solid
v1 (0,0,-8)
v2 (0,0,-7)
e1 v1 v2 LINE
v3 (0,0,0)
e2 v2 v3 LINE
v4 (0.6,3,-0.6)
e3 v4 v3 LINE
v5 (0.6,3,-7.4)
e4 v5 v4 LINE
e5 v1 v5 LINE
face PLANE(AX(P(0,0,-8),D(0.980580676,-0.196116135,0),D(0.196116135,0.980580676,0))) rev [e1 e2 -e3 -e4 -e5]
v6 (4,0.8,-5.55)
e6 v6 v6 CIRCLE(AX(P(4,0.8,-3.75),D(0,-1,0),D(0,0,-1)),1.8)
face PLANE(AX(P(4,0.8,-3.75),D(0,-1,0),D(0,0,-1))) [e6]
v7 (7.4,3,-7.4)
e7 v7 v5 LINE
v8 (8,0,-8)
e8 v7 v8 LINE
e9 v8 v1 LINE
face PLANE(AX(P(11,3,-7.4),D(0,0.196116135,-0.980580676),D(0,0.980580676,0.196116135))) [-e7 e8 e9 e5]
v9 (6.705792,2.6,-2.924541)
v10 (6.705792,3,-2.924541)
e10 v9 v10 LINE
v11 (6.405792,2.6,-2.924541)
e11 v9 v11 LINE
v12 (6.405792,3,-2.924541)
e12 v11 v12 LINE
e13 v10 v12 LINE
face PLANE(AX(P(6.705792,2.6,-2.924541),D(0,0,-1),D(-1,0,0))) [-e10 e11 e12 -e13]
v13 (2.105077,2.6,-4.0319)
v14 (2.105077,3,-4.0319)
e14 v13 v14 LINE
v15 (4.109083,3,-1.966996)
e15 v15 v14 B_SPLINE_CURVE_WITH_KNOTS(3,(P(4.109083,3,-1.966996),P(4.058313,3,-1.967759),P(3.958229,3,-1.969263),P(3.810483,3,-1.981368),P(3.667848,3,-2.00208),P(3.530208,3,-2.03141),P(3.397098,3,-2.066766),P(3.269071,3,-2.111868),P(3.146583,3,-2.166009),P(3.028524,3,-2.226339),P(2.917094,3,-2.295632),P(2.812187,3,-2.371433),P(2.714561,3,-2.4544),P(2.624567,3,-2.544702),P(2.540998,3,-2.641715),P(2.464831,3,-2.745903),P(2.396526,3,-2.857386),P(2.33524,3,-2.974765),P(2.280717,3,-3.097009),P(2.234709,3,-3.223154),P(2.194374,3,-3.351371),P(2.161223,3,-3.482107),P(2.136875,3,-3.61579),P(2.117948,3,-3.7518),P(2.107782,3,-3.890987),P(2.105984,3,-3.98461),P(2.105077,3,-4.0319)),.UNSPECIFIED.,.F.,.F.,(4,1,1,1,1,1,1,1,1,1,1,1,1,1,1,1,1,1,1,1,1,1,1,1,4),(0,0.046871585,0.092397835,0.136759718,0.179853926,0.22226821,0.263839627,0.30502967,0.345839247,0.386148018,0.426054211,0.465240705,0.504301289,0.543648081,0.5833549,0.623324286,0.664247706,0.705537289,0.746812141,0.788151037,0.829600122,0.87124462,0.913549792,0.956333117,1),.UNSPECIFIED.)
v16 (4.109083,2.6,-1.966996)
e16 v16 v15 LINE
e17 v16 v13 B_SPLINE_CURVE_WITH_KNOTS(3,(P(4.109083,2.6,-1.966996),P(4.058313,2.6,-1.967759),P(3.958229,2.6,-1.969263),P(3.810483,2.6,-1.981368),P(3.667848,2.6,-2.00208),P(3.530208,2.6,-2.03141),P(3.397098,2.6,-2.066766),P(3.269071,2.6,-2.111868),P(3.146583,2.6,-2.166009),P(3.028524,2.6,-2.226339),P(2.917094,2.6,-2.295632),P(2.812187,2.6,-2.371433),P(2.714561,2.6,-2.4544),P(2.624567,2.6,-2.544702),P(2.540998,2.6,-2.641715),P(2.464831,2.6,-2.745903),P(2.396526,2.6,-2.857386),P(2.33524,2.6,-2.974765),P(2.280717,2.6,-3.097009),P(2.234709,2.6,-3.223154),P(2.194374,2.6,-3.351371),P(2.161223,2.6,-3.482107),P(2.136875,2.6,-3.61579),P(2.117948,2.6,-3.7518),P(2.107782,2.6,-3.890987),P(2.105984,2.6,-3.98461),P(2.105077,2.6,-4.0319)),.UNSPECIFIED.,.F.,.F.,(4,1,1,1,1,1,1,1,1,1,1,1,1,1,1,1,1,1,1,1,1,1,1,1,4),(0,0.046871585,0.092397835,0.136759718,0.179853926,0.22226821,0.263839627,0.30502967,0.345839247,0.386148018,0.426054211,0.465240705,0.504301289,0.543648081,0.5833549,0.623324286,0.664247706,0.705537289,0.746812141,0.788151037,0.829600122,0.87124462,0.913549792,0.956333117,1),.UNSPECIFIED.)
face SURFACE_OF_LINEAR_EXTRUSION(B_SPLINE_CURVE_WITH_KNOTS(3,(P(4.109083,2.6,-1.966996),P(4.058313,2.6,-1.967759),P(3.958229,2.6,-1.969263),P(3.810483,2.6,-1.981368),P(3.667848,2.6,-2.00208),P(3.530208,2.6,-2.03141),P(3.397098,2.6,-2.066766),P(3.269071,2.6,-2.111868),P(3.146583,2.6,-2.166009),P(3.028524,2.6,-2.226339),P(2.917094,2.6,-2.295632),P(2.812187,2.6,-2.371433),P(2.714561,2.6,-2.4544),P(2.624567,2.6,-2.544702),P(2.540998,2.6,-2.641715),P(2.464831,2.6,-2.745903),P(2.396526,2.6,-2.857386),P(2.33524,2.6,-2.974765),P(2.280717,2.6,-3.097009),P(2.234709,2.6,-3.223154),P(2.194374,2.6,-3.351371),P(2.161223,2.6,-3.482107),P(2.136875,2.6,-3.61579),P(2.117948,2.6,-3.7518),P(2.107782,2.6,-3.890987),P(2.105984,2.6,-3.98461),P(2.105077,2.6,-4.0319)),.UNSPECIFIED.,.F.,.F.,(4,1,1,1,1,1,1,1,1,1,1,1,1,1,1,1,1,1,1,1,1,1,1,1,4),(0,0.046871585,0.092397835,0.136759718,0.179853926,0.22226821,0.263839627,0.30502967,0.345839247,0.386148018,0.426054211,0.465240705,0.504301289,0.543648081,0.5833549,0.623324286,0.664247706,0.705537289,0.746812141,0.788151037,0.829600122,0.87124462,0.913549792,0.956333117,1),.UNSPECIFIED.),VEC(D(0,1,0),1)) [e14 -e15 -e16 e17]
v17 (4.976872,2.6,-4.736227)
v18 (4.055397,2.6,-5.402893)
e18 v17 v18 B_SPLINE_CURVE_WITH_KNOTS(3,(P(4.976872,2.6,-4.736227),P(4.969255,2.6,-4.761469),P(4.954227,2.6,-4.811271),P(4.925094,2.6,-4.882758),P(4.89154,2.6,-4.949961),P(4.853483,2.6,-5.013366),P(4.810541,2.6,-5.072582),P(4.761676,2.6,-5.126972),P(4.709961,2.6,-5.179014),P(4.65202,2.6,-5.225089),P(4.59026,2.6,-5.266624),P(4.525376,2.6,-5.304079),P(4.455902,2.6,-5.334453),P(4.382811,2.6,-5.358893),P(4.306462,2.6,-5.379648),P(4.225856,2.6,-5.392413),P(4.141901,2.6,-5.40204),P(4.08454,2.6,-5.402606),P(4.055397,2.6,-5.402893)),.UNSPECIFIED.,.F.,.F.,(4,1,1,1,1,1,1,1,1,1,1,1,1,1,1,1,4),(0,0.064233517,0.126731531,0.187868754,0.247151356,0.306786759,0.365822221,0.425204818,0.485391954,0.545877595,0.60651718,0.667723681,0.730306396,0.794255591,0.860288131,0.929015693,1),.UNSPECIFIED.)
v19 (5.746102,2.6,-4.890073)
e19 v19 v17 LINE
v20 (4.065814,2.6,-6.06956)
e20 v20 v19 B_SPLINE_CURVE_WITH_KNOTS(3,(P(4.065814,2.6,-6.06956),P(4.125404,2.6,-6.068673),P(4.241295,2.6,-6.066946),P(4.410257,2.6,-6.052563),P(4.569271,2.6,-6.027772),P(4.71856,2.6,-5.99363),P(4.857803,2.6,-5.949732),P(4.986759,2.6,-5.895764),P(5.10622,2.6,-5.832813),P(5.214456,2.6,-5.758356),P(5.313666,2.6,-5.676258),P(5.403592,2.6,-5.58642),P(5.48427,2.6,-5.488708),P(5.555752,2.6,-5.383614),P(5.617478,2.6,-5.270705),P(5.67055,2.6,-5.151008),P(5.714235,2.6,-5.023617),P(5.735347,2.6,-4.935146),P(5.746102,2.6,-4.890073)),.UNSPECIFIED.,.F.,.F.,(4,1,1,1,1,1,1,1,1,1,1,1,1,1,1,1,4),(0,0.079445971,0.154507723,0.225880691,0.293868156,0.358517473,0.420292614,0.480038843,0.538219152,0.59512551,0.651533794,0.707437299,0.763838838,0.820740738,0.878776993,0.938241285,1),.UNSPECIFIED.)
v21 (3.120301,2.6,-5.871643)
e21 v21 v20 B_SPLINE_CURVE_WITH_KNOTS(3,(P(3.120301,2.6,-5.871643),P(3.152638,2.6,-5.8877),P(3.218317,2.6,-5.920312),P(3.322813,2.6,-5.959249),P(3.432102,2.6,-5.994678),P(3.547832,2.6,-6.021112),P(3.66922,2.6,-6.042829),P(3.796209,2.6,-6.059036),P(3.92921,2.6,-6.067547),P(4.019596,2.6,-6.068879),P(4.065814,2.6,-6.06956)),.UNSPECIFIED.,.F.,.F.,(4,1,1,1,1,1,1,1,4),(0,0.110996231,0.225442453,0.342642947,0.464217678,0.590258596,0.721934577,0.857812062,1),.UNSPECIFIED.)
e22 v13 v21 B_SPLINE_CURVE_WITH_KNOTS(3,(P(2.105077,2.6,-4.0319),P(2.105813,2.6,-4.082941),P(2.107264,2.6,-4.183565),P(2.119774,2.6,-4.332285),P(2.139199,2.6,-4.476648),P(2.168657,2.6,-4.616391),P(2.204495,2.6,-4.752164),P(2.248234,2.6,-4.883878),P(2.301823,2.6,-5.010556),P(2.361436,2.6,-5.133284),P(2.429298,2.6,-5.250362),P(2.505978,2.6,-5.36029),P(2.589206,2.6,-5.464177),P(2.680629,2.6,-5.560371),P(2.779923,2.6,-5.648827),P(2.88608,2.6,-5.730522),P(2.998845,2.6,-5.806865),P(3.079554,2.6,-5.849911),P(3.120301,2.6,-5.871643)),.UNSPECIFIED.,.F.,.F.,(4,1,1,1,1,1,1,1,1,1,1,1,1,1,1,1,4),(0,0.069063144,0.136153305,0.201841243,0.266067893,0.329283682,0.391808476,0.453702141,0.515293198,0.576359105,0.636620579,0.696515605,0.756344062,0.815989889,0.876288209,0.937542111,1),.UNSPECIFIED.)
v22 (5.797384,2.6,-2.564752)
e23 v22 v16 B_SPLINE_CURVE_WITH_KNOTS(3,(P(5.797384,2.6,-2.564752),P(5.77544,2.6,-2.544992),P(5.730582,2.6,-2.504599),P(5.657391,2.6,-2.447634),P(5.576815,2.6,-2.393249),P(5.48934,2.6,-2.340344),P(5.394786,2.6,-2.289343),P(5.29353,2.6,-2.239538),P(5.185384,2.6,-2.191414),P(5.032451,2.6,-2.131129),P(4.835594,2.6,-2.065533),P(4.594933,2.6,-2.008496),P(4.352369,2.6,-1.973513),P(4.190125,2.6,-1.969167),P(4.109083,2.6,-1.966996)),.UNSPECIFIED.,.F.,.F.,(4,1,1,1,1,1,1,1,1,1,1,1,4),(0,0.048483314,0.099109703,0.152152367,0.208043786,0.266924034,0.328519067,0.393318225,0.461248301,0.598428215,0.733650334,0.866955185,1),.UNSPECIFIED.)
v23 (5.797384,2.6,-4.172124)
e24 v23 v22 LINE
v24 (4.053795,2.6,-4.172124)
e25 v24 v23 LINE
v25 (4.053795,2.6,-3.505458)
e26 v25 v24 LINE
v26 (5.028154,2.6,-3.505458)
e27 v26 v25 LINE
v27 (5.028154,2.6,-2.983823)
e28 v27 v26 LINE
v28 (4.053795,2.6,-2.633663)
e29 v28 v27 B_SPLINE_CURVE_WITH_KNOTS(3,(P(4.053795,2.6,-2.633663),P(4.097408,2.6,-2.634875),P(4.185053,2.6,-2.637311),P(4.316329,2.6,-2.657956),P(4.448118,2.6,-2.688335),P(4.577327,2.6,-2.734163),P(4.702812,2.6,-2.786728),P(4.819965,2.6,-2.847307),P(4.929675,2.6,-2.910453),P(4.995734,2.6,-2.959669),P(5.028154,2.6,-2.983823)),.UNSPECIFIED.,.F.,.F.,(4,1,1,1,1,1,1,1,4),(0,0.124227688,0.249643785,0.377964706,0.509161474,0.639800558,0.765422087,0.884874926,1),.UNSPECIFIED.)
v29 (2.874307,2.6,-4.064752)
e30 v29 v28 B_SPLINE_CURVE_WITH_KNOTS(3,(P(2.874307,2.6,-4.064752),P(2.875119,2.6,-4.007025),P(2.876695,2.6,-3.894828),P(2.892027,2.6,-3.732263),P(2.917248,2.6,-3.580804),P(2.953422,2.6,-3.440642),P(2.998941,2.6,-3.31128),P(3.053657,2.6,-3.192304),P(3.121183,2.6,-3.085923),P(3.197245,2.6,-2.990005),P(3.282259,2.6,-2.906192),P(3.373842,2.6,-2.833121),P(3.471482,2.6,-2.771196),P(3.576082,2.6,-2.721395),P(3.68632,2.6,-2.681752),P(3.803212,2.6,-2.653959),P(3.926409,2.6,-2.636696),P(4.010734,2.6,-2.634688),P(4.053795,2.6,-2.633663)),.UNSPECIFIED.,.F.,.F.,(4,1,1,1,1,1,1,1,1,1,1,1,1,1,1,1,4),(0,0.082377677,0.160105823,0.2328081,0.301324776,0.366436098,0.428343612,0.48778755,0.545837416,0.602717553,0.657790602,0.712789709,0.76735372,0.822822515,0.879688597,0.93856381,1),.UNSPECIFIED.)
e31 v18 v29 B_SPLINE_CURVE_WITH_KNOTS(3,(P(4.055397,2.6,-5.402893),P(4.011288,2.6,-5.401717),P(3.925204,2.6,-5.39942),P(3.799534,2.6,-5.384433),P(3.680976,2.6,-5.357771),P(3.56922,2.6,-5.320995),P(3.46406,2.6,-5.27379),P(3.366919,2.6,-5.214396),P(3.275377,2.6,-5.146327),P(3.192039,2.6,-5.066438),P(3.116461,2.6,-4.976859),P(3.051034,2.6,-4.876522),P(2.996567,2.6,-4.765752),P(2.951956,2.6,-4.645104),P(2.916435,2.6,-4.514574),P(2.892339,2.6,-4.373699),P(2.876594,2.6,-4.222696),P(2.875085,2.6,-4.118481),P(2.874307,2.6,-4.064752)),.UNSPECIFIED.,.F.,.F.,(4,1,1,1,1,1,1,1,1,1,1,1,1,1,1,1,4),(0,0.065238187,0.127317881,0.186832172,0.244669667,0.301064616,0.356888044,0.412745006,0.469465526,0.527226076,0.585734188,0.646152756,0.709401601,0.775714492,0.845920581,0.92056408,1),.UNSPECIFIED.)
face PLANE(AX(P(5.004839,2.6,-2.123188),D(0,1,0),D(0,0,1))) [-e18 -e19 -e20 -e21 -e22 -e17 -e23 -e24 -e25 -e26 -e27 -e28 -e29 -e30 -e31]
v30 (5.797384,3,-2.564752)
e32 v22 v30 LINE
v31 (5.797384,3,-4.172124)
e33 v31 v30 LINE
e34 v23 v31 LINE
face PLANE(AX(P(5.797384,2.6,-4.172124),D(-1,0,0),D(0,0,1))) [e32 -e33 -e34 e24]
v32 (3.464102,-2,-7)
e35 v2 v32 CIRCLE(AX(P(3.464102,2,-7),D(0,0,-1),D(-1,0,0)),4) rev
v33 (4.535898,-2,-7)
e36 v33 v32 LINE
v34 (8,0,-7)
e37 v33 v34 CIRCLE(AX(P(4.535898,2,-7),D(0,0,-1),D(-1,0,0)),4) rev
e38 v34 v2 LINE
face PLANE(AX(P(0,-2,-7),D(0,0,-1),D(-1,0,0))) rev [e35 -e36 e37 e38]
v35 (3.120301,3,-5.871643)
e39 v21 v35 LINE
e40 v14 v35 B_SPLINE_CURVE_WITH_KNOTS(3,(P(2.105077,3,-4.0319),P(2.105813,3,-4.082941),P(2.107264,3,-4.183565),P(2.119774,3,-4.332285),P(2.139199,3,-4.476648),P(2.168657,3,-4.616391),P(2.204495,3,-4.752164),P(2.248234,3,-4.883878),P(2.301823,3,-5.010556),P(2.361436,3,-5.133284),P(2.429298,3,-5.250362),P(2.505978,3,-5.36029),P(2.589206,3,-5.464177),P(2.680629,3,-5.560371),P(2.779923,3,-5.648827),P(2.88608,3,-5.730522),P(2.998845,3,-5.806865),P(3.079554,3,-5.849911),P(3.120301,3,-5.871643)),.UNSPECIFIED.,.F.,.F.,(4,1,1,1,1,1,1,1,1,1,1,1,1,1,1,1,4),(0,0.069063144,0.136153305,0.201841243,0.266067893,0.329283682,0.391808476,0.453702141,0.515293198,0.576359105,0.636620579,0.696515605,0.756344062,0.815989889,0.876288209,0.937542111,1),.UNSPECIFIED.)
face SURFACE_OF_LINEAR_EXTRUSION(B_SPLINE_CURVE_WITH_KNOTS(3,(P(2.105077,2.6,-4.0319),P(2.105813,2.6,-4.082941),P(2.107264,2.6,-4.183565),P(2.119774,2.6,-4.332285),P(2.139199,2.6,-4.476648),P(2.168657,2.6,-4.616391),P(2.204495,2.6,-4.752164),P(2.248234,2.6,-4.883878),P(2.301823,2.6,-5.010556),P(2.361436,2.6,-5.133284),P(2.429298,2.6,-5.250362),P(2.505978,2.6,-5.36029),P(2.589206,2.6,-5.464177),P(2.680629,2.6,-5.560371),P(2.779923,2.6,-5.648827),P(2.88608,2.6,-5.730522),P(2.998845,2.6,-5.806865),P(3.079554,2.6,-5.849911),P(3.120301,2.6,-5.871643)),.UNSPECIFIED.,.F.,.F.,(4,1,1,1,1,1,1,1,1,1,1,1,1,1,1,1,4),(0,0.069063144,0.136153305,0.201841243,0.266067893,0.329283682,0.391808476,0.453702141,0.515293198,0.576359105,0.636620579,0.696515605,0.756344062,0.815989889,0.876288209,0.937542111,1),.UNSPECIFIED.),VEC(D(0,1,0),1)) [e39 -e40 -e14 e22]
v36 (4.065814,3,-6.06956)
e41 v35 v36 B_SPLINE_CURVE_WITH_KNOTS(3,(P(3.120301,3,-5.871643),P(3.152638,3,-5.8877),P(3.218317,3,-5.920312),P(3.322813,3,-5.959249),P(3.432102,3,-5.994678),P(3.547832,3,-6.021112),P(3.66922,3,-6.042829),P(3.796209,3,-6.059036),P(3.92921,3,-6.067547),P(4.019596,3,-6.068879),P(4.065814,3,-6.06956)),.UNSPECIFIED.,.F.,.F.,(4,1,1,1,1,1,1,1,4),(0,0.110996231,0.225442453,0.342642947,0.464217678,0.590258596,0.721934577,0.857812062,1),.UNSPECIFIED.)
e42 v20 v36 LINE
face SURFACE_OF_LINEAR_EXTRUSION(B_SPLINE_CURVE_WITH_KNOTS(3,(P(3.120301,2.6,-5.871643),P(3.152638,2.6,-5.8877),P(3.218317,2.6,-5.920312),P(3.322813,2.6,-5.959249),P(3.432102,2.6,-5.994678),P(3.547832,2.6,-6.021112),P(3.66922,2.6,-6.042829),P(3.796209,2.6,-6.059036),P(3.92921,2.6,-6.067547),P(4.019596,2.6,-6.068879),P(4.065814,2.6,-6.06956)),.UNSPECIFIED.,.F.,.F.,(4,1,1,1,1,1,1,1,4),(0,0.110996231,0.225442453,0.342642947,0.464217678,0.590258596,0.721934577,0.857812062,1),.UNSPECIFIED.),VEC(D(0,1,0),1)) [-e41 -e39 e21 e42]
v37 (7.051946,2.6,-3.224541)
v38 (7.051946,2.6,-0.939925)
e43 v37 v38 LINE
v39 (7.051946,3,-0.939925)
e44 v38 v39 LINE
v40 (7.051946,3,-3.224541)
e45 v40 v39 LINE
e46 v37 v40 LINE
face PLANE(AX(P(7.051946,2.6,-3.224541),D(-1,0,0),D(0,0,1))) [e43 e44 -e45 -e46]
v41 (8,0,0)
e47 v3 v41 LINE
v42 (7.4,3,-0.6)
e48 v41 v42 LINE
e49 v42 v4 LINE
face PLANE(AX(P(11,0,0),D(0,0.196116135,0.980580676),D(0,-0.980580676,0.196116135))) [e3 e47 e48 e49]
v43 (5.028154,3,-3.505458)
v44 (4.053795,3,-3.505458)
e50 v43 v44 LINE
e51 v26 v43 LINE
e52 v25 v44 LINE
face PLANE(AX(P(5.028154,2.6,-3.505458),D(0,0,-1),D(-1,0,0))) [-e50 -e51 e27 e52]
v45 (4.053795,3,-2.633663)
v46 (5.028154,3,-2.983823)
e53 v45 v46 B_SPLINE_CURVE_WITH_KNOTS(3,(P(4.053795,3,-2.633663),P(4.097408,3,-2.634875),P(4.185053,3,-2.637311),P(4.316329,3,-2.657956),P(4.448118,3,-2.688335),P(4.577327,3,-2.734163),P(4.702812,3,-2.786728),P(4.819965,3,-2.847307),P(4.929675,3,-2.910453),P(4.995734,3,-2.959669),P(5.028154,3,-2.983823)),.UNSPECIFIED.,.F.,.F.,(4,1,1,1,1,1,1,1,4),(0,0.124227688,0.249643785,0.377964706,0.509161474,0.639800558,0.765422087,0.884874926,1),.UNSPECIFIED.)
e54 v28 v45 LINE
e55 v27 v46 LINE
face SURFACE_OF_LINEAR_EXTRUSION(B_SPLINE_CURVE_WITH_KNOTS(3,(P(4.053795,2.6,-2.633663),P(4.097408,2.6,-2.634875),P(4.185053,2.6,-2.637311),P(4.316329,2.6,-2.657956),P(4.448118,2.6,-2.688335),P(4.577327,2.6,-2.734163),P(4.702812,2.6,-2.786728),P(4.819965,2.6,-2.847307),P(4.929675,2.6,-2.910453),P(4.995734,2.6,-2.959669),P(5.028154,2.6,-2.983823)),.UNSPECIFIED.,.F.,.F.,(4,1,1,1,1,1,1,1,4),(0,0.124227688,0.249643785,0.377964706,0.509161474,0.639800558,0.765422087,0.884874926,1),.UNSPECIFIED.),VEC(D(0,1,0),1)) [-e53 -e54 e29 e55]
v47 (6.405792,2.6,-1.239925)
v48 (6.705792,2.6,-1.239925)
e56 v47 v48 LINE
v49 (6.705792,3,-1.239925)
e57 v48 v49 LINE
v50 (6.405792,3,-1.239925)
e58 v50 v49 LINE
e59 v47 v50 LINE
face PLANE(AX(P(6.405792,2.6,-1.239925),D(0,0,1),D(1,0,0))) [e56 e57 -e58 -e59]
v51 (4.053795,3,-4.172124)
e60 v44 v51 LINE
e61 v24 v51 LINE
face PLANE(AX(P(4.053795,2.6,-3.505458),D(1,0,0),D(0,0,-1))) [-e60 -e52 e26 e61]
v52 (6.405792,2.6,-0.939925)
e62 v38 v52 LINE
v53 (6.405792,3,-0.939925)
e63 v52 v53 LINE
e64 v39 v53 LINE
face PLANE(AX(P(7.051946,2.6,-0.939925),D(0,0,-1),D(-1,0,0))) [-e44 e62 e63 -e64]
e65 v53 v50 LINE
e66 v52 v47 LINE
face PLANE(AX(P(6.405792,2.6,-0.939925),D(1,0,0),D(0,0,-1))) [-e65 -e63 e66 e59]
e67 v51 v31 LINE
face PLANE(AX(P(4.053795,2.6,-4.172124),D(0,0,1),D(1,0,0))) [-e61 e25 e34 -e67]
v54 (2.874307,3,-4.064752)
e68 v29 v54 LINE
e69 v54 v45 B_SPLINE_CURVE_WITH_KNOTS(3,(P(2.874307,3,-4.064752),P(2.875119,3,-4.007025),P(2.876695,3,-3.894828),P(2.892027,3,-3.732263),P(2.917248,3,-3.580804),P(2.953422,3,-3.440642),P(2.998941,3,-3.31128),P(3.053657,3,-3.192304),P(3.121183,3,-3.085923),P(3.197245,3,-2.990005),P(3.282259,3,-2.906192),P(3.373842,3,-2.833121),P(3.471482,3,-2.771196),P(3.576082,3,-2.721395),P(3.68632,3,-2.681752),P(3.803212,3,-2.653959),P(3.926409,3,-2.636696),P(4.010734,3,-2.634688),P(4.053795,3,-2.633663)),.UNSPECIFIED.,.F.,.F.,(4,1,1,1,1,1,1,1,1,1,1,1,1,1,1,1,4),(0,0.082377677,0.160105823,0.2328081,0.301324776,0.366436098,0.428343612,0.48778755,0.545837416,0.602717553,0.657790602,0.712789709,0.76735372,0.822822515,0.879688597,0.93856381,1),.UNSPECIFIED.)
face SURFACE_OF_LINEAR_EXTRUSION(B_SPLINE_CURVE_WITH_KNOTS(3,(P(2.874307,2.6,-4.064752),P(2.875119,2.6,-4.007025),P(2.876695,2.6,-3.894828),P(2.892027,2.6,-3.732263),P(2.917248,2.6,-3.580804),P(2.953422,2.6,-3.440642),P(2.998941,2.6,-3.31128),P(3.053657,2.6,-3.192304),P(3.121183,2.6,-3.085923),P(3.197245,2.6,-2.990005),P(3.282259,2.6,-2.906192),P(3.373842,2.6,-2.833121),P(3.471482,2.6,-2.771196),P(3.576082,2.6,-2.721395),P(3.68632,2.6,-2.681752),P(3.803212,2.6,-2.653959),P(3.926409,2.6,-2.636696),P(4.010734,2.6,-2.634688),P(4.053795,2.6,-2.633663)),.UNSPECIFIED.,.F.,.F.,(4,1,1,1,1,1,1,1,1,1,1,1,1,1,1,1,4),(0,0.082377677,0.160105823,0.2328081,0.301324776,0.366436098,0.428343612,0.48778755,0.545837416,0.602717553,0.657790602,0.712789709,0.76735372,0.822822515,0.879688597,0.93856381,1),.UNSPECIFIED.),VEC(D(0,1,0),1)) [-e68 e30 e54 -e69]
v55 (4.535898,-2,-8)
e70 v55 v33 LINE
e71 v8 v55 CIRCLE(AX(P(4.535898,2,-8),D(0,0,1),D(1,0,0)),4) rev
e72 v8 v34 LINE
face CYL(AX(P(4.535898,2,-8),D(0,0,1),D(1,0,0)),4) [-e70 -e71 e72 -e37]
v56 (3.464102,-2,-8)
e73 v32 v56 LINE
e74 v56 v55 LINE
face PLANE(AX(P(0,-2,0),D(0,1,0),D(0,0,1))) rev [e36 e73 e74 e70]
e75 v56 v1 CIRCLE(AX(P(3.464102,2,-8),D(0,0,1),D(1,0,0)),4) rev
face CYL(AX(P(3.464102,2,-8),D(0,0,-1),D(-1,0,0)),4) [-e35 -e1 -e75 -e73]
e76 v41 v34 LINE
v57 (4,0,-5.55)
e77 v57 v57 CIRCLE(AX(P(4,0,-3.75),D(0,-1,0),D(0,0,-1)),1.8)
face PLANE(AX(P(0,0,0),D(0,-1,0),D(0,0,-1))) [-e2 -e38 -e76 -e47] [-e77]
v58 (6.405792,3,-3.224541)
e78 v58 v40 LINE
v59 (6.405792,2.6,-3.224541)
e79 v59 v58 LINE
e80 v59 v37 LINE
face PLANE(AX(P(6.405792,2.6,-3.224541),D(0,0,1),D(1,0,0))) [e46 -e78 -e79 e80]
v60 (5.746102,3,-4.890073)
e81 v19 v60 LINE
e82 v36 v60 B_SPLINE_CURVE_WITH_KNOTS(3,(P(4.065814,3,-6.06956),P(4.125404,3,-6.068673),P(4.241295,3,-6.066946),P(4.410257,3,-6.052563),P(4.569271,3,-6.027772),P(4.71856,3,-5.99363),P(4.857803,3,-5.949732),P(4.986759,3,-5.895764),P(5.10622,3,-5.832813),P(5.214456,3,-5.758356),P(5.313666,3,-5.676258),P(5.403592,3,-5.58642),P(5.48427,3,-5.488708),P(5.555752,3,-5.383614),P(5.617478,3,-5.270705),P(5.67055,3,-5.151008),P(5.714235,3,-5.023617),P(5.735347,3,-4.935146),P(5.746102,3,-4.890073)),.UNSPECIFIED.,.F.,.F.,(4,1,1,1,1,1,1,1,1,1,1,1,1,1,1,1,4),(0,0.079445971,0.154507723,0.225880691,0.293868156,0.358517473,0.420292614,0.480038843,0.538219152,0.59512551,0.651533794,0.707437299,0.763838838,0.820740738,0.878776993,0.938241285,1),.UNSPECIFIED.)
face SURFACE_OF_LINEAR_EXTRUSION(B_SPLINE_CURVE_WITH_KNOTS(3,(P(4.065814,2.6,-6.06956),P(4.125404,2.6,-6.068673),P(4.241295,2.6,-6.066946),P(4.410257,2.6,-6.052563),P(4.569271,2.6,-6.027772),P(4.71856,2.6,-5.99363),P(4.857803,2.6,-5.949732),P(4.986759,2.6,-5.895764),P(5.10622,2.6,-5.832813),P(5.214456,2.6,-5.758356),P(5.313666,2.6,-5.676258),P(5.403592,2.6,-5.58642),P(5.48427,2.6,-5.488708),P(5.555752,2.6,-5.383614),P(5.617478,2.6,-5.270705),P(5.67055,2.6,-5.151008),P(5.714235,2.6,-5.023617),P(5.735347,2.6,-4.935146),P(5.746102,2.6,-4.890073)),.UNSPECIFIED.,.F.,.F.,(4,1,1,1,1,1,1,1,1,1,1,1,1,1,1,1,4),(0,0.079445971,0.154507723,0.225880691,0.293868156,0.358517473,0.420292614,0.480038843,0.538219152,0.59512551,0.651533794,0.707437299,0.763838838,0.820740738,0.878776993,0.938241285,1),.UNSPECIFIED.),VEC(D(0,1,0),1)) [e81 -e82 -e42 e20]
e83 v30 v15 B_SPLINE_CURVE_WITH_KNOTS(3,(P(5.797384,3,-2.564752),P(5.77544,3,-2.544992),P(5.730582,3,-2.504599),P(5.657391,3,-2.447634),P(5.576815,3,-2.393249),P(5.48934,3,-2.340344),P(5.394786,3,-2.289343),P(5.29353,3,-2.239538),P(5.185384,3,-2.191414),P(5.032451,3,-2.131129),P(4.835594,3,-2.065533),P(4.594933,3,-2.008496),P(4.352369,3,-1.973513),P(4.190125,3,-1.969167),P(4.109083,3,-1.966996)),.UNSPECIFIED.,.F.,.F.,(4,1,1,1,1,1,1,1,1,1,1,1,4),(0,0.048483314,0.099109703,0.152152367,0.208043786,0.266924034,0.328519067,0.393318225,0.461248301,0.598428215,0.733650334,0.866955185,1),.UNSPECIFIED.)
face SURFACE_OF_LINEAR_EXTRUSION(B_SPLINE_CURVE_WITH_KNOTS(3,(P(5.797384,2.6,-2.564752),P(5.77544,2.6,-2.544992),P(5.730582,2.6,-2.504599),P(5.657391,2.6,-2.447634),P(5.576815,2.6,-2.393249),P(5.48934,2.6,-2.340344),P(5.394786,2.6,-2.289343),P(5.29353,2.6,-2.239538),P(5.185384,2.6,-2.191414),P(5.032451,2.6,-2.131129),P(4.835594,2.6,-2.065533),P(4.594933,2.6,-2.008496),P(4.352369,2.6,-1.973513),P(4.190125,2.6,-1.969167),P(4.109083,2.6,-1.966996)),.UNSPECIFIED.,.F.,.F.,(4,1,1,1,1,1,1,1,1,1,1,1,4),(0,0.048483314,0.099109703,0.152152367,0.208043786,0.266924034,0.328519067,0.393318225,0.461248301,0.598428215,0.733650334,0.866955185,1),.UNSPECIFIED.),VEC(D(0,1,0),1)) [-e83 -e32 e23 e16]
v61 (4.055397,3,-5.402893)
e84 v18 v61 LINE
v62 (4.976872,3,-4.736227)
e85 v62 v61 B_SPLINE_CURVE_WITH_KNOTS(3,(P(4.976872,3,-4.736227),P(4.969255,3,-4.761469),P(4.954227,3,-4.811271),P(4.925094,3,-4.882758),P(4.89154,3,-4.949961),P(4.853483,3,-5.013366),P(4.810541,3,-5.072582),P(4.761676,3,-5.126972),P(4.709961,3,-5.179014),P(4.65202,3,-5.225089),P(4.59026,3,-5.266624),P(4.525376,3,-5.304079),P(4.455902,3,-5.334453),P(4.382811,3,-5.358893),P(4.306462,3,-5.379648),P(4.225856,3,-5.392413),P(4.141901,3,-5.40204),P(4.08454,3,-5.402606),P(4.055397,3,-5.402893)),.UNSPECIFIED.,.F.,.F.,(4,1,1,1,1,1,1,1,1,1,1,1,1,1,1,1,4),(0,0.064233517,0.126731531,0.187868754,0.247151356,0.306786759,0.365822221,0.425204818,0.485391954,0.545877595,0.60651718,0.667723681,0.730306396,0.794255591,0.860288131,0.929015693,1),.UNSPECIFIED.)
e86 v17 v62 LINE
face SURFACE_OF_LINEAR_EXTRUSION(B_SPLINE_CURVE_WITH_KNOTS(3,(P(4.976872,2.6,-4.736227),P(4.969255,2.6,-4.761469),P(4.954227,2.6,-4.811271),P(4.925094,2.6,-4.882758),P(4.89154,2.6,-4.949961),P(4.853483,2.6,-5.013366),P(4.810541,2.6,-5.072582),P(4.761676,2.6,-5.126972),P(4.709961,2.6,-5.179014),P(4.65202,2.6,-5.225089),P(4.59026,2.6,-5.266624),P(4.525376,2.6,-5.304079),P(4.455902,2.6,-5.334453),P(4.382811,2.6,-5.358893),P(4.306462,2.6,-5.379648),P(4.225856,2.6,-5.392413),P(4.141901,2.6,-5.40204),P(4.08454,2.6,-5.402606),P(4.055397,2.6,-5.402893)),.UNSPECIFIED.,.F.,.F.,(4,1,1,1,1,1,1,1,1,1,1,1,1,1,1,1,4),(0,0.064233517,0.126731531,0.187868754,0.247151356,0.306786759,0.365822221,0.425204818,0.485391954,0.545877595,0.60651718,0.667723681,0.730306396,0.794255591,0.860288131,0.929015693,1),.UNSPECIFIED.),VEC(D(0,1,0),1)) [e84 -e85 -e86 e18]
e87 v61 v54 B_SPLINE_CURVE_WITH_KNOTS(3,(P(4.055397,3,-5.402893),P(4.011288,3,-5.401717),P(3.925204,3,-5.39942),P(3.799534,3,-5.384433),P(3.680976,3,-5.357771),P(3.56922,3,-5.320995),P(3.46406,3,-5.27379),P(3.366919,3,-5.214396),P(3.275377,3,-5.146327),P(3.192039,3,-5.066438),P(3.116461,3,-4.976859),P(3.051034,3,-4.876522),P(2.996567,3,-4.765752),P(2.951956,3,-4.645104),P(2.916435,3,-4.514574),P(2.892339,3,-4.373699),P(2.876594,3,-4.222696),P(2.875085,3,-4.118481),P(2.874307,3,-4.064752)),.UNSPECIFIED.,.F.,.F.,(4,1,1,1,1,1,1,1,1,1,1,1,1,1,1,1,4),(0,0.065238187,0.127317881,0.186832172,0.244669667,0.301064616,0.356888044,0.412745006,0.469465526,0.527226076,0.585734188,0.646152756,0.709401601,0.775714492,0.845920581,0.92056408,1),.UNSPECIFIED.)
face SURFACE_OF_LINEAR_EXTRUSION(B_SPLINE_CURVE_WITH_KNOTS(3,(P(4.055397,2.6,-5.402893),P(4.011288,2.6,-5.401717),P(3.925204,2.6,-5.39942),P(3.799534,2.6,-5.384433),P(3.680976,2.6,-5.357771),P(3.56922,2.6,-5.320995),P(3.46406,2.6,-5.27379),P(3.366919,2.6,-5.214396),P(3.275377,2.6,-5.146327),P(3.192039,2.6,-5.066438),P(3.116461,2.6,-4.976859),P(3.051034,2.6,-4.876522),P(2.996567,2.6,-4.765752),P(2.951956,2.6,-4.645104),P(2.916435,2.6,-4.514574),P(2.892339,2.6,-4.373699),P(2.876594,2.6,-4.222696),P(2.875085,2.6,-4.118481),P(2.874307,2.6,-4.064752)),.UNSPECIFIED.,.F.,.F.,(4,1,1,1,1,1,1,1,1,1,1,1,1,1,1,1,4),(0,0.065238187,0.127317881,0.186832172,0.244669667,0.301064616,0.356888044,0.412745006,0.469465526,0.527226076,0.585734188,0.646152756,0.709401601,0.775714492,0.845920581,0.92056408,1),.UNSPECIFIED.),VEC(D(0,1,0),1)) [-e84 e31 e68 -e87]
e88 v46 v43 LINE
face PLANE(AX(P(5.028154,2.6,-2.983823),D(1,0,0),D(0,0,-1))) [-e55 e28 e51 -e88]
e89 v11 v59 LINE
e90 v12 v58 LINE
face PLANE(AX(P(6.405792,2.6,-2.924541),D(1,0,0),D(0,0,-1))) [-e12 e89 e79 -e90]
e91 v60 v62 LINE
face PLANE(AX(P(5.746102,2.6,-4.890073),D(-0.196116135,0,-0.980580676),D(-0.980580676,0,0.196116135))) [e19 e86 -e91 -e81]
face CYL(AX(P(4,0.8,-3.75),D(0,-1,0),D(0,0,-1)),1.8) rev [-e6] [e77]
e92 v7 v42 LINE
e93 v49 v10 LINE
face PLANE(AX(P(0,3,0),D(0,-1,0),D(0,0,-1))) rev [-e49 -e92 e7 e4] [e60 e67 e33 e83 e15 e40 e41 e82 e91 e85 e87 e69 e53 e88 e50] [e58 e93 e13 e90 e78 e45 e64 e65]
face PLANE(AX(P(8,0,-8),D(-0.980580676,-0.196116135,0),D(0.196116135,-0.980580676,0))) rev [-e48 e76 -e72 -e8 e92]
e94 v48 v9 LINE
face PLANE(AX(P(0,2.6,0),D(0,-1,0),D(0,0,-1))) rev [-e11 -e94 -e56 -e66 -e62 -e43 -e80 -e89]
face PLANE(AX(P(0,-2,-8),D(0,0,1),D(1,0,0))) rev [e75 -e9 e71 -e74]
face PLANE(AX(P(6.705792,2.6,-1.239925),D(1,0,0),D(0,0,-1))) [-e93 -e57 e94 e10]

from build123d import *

# Parameters (mm, degrees)
SKETCH1_W               = 8
SKETCH1_H               = 8
BOSS_EXTRUDE1_DEPTH     = 3
CUT_EXTRUDE1_DEPTH      = 12.704699911
CUT_EXTRUDE1_DEPTH_BACK = 12.704699911
CUT_EXTRUDE2_DEPTH      = 11
SKETCH4_R               = 1.8
CUT_EXTRUDE3_DEPTH      = 0.8
SKETCH5_W               = 8
SKETCH5_H               = 1
BOSS_EXTRUDE2_DEPTH     = 2
FILLET1_R               = 4
CUT_EXTRUDE4_DEPTH      = 0.4
CUT_EXTRUDE5_DEPTH      = 0.4


with BuildPart() as part:
    # Sketch1 → Boss-Extrude1 (new body)
    with BuildSketch(Plane(origin=(0, 0, 0), x_dir=(1, 0, 0), z_dir=(0, 1, 0))):
        with Locations((4, 4)):
            Rectangle(SKETCH1_W, SKETCH1_H)
    extrude(amount=BOSS_EXTRUDE1_DEPTH)

    # Sketch2 → Cut-Extrude1 (cut, two sides: drawn at the far end of the back side and taken through both)
    with BuildSketch(Plane.XY.offset(-CUT_EXTRUDE1_DEPTH_BACK)):
        Polygon((0, 0), (0.6, 3), (0, 3), align=None)
        Polygon((8, 0), (7.4, 3), (8, 3), align=None)
    extrude(amount=CUT_EXTRUDE1_DEPTH + CUT_EXTRUDE1_DEPTH_BACK, mode=Mode.SUBTRACT)

    # Sketch3 → Cut-Extrude2 (cut)
    with BuildSketch(Plane(origin=(0, 0, 0), x_dir=(0, 0, -1), z_dir=(1, 0, 0))):
        Polygon((0, 0), (0.6, 3), (0, 3), align=None)
        Polygon((8, 3), (7.4, 3), (8, 0), align=None)
    extrude(amount=CUT_EXTRUDE2_DEPTH, mode=Mode.SUBTRACT)

    # Sketch4 → Cut-Extrude3 (cut)
    with BuildSketch(Plane.XZ):
        with Locations(Location((4, -3.75, 0), (0, 0, 270))):
            Circle(SKETCH4_R)
    extrude(amount=-CUT_EXTRUDE3_DEPTH, mode=Mode.SUBTRACT)

    # Sketch5 → Boss-Extrude2 (add)
    with BuildSketch(Plane.XZ):
        with Locations((4, -7.5)):
            Rectangle(SKETCH5_W, SKETCH5_H)
    extrude(amount=BOSS_EXTRUDE2_DEPTH)

    # Fillet1
    # the kernel refuses this fillet: 4 mm, written as the material it takes off along each edge
    with BuildSketch(Plane(origin=(8, -2, -16.660254038), x_dir=(0, 1, 0), z_dir=(0, 0, 1)), Plane(origin=(0, -2, 1.660254038), x_dir=(0, 1, 0), z_dir=(0, 0, -1))) as fillet1_piece_1:
        with BuildLine():
            CenterArc((4, 3.464101615), FILLET1_R, 180, 60)
            Line((0, 3.464101615), (-0.08, 3.464101615))
            Line((-0.08, 3.464101615), (-0.08, 0))
            Line((-0.08, 0), (0, -0.08))
            ThreePointArc((0, -0.08), (1, -0.08), (1.96, -0.069282032))
            Line((1.96, -0.069282032), (2, 0))
        make_face()
    extrude(amount=18.320508076, mode=Mode.SUBTRACT)

    # Sketch6 → Cut-Extrude4 (cut)
    with BuildSketch(Plane(origin=(0, 3, 0), x_dir=(1, 0, 0), z_dir=(0, 1, 0))):
        with BuildLine():
            Line((4.053794593, 3.505457585), (4.053794593, 4.172124252))
            Line((4.053794593, 4.172124252), (5.797384337, 4.172124252))
            Line((5.797384337, 4.172124252), (5.797384337, 2.564752457))
            add(Edge.make_bspline(
                [(5.797384337, 2.564752457), (5.775440275, 2.544992361), (5.730582172, 2.504598726), (5.657391115, 2.447633596), (5.576814656, 2.393249062), (5.489339896, 2.340343698), (5.394785806, 2.289343315), (5.293529517, 2.239537607), (5.185384208, 2.19141366), (5.032450931, 2.131128575), (4.835594452, 2.065533422), (4.594933471, 2.008496304), (4.352368706, 1.973513189), (4.190125473, 1.969167013), (4.109083055, 1.966996047)],
                knots=[0, 0, 0, 0, 0.581799769, 1.189316438, 1.825828404, 2.496525428, 3.203088405, 3.942228803, 4.719818701, 5.534979611, 7.181138583, 8.803804008, 10.403462225, 12, 12, 12, 12], degree=3))
            add(Edge.make_bspline(
                [(4.109083055, 1.966996047), (4.058312627, 1.967758979), (3.958229013, 1.969262944), (3.810482794, 1.981368296), (3.667847904, 2.002080495), (3.530208107, 2.031409962), (3.397097502, 2.066765974), (3.26907094, 2.111868039), (3.146582956, 2.166009466), (3.028523806, 2.226338905), (2.917094396, 2.295632176), (2.812187083, 2.371432832), (2.714561168, 2.454400196), (2.624566637, 2.544701507), (2.540998329, 2.641714843), (2.464831298, 2.745902822), (2.396526155, 2.857385727), (2.335239765, 2.974765127), (2.280716867, 3.097008702), (2.234709094, 3.223154334), (2.194374003, 3.351370526), (2.161222966, 3.482107416), (2.136875151, 3.615790052), (2.117947657, 3.751799892), (2.107781758, 3.890986734), (2.105984472, 3.984609884), (2.105076645, 4.031899893)],
                knots=[0, 0, 0, 0, 1.124918047, 2.217548049, 3.282233239, 4.316494221, 5.334437038, 6.332151046, 7.320712088, 8.300141923, 9.267552434, 10.225301062, 11.165776911, 12.103230934, 13.047553934, 14.000517593, 14.959782875, 15.941944936, 16.932894943, 17.923491392, 18.915624898, 19.910402922, 20.909870877, 21.92519501, 22.95199481, 24, 24, 24, 24], degree=3))
            add(Edge.make_bspline(
                [(2.105076645, 4.031899893), (2.105812881, 4.082940857), (2.107264322, 4.183564655), (2.119773705, 4.33228546), (2.139199297, 4.476648194), (2.168656936, 4.616390773), (2.20449512, 4.75216369), (2.248233589, 4.883877531), (2.301822866, 5.010556427), (2.361436063, 5.133283761), (2.429297714, 5.250362339), (2.505977563, 5.360290437), (2.589206445, 5.464176802), (2.680629029, 5.560371285), (2.779923369, 5.648827012), (2.886080088, 5.730522243), (2.998844963, 5.806865303), (3.079553832, 5.849911113), (3.120301004, 5.871643482)],
                knots=[0, 0, 0, 0, 1.105010302, 2.178452875, 3.229459892, 4.257086284, 5.268538906, 6.268935615, 7.259234261, 8.24469117, 9.221745683, 10.185929258, 11.144249683, 12.101504986, 13.055838221, 14.020611351, 15.000673771, 16, 16, 16, 16], degree=3))
            add(Edge.make_bspline(
                [(3.120301004, 5.871643482), (3.152638085, 5.887700047), (3.218317351, 5.920312247), (3.322813337, 5.959248923), (3.432101667, 5.994677516), (3.547832356, 6.021111591), (3.6692195, 6.042829226), (3.796209305, 6.059036287), (3.929210312, 6.067547239), (4.019595582, 6.068879104), (4.065813824, 6.069560149)],
                knots=[0, 0, 0, 0, 0.887969848, 1.803539625, 2.741143579, 3.713741423, 4.722068772, 5.775476617, 6.8624965, 8, 8, 8, 8], degree=3))
            add(Edge.make_bspline(
                [(4.065813824, 6.069560149), (4.125403824, 6.06867255), (4.241295356, 6.066946335), (4.410256532, 6.05256252), (4.569271079, 6.027772487), (4.718560435, 5.993629866), (4.857802985, 5.949731518), (4.986759025, 5.895763799), (5.106220057, 5.832812796), (5.214455834, 5.758355608), (5.313666102, 5.676257846), (5.403591975, 5.586419647), (5.48426965, 5.488707943), (5.555752499, 5.383614392), (5.617477906, 5.2707046), (5.670549966, 5.151008328), (5.714234697, 5.023616882), (5.73534656, 4.935145779), (5.746102286, 4.89007297)],
                knots=[0, 0, 0, 0, 1.271135529, 2.472123572, 3.614091059, 4.701890498, 5.736279567, 6.724681829, 7.680621489, 8.611506429, 9.52200816, 10.424540711, 11.318996785, 12.221421405, 13.131851814, 14.060431888, 15.011860567, 16, 16, 16, 16], degree=3))
            Line((5.746102286, 4.89007297), (4.976871517, 4.736226816))
            add(Edge.make_bspline(
                [(4.976871517, 4.736226816), (4.969254672, 4.761468809), (4.95422678, 4.81127079), (4.925094227, 4.882758251), (4.891539922, 4.949961192), (4.853483379, 5.013366036), (4.810541206, 5.072582433), (4.761675926, 5.126971617), (4.709961453, 5.179014495), (4.652020351, 5.225088646), (4.590259767, 5.266624284), (4.52537561, 5.304078684), (4.455901775, 5.334453158), (4.382811411, 5.358892727), (4.306461756, 5.37964837), (4.225856415, 5.392413169), (4.141900573, 5.402040295), (4.084540473, 5.402606041), (4.055397158, 5.402893482)],
                knots=[0, 0, 0, 0, 1.027736275, 2.027704492, 3.005900071, 3.954421694, 4.908588141, 5.853155543, 6.803277083, 7.766271258, 8.734041521, 9.704274878, 10.683578894, 11.68490234, 12.708089448, 13.76461009, 14.864251086, 16, 16, 16, 16], degree=3))
            add(Edge.make_bspline(
                [(4.055397158, 5.402893482), (4.01128773, 5.401716629), (3.925204424, 5.399419898), (3.799534269, 5.384433236), (3.680976007, 5.357770589), (3.569219615, 5.320994553), (3.46406021, 5.273789934), (3.366918824, 5.2143961), (3.275376693, 5.146327474), (3.192038786, 5.066438045), (3.116460773, 4.976859168), (3.051034483, 4.876522357), (2.996567377, 4.765751945), (2.951955713, 4.645104141), (2.91643531, 4.514573915), (2.892338718, 4.373699188), (2.876594443, 4.222696077), (2.875085403, 4.118480819), (2.874307414, 4.064752457)],
                knots=[0, 0, 0, 0, 1.043810997, 2.037086103, 2.989314757, 3.91471467, 4.817033861, 5.710208705, 6.603920097, 7.511448416, 8.435617211, 9.371747005, 10.338444094, 11.350425613, 12.411431869, 13.5347293, 14.729025275, 16, 16, 16, 16], degree=3))
            add(Edge.make_bspline(
                [(2.874307414, 4.064752457), (2.875118698, 4.00702506), (2.876695474, 3.894828493), (2.892027057, 3.732262921), (2.917247643, 3.580803592), (2.95342224, 3.44064155), (2.998941149, 3.311279521), (3.053656914, 3.192304252), (3.121182779, 3.085923464), (3.197244894, 2.990004781), (3.28225913, 2.906191636), (3.37384152, 2.833121051), (3.471482188, 2.77119638), (3.576081527, 2.721395085), (3.686320303, 2.681751972), (3.80321198, 2.653959398), (3.926408504, 2.636695674), (4.010734238, 2.634687946), (4.053794593, 2.633662713)],
                knots=[0, 0, 0, 0, 1.318042826, 2.561693173, 3.724929596, 4.821196409, 5.862977565, 6.853497791, 7.804600806, 8.73339865, 9.643480846, 10.524649628, 11.404635349, 12.277659519, 13.165160235, 14.075017549, 15.017020959, 16, 16, 16, 16], degree=3))
            add(Edge.make_bspline(
                [(4.053794593, 2.633662713), (4.097408334, 2.634875039), (4.185053042, 2.637311287), (4.316328539, 2.657956024), (4.448117665, 2.68833542), (4.577327471, 2.734163302), (4.70281192, 2.786727561), (4.819965055, 2.847306941), (4.929675356, 2.910453005), (4.995733738, 2.959668979), (5.028153568, 2.98382297)],
                knots=[0, 0, 0, 0, 0.993821502, 1.997150276, 3.023717651, 4.073291794, 5.118404464, 6.123376694, 7.078999408, 8, 8, 8, 8], degree=3))
            Line((5.028153568, 2.98382297), (5.028153568, 3.505457585))
            Line((5.028153568, 3.505457585), (4.053794593, 3.505457585))
        make_face()
    extrude(amount=-CUT_EXTRUDE4_DEPTH, mode=Mode.SUBTRACT)

    # Sketch7 → Cut-Extrude5 (cut)
    with BuildSketch(Plane(origin=(0, 3, 0), x_dir=(1, 0, 0), z_dir=(0, 1, 0))):
        Polygon((7.051946272, 3.224540865), (7.051946272, 0.93992548), (6.405792426, 0.93992548), (6.405792426, 1.23992548), (6.705792426, 1.23992548), (6.705792426, 2.924540865), (6.405792426, 2.924540865), (6.405792426, 3.224540865), align=None)
    extrude(amount=-CUT_EXTRUDE5_DEPTH, mode=Mode.SUBTRACT)


solid = part.part
